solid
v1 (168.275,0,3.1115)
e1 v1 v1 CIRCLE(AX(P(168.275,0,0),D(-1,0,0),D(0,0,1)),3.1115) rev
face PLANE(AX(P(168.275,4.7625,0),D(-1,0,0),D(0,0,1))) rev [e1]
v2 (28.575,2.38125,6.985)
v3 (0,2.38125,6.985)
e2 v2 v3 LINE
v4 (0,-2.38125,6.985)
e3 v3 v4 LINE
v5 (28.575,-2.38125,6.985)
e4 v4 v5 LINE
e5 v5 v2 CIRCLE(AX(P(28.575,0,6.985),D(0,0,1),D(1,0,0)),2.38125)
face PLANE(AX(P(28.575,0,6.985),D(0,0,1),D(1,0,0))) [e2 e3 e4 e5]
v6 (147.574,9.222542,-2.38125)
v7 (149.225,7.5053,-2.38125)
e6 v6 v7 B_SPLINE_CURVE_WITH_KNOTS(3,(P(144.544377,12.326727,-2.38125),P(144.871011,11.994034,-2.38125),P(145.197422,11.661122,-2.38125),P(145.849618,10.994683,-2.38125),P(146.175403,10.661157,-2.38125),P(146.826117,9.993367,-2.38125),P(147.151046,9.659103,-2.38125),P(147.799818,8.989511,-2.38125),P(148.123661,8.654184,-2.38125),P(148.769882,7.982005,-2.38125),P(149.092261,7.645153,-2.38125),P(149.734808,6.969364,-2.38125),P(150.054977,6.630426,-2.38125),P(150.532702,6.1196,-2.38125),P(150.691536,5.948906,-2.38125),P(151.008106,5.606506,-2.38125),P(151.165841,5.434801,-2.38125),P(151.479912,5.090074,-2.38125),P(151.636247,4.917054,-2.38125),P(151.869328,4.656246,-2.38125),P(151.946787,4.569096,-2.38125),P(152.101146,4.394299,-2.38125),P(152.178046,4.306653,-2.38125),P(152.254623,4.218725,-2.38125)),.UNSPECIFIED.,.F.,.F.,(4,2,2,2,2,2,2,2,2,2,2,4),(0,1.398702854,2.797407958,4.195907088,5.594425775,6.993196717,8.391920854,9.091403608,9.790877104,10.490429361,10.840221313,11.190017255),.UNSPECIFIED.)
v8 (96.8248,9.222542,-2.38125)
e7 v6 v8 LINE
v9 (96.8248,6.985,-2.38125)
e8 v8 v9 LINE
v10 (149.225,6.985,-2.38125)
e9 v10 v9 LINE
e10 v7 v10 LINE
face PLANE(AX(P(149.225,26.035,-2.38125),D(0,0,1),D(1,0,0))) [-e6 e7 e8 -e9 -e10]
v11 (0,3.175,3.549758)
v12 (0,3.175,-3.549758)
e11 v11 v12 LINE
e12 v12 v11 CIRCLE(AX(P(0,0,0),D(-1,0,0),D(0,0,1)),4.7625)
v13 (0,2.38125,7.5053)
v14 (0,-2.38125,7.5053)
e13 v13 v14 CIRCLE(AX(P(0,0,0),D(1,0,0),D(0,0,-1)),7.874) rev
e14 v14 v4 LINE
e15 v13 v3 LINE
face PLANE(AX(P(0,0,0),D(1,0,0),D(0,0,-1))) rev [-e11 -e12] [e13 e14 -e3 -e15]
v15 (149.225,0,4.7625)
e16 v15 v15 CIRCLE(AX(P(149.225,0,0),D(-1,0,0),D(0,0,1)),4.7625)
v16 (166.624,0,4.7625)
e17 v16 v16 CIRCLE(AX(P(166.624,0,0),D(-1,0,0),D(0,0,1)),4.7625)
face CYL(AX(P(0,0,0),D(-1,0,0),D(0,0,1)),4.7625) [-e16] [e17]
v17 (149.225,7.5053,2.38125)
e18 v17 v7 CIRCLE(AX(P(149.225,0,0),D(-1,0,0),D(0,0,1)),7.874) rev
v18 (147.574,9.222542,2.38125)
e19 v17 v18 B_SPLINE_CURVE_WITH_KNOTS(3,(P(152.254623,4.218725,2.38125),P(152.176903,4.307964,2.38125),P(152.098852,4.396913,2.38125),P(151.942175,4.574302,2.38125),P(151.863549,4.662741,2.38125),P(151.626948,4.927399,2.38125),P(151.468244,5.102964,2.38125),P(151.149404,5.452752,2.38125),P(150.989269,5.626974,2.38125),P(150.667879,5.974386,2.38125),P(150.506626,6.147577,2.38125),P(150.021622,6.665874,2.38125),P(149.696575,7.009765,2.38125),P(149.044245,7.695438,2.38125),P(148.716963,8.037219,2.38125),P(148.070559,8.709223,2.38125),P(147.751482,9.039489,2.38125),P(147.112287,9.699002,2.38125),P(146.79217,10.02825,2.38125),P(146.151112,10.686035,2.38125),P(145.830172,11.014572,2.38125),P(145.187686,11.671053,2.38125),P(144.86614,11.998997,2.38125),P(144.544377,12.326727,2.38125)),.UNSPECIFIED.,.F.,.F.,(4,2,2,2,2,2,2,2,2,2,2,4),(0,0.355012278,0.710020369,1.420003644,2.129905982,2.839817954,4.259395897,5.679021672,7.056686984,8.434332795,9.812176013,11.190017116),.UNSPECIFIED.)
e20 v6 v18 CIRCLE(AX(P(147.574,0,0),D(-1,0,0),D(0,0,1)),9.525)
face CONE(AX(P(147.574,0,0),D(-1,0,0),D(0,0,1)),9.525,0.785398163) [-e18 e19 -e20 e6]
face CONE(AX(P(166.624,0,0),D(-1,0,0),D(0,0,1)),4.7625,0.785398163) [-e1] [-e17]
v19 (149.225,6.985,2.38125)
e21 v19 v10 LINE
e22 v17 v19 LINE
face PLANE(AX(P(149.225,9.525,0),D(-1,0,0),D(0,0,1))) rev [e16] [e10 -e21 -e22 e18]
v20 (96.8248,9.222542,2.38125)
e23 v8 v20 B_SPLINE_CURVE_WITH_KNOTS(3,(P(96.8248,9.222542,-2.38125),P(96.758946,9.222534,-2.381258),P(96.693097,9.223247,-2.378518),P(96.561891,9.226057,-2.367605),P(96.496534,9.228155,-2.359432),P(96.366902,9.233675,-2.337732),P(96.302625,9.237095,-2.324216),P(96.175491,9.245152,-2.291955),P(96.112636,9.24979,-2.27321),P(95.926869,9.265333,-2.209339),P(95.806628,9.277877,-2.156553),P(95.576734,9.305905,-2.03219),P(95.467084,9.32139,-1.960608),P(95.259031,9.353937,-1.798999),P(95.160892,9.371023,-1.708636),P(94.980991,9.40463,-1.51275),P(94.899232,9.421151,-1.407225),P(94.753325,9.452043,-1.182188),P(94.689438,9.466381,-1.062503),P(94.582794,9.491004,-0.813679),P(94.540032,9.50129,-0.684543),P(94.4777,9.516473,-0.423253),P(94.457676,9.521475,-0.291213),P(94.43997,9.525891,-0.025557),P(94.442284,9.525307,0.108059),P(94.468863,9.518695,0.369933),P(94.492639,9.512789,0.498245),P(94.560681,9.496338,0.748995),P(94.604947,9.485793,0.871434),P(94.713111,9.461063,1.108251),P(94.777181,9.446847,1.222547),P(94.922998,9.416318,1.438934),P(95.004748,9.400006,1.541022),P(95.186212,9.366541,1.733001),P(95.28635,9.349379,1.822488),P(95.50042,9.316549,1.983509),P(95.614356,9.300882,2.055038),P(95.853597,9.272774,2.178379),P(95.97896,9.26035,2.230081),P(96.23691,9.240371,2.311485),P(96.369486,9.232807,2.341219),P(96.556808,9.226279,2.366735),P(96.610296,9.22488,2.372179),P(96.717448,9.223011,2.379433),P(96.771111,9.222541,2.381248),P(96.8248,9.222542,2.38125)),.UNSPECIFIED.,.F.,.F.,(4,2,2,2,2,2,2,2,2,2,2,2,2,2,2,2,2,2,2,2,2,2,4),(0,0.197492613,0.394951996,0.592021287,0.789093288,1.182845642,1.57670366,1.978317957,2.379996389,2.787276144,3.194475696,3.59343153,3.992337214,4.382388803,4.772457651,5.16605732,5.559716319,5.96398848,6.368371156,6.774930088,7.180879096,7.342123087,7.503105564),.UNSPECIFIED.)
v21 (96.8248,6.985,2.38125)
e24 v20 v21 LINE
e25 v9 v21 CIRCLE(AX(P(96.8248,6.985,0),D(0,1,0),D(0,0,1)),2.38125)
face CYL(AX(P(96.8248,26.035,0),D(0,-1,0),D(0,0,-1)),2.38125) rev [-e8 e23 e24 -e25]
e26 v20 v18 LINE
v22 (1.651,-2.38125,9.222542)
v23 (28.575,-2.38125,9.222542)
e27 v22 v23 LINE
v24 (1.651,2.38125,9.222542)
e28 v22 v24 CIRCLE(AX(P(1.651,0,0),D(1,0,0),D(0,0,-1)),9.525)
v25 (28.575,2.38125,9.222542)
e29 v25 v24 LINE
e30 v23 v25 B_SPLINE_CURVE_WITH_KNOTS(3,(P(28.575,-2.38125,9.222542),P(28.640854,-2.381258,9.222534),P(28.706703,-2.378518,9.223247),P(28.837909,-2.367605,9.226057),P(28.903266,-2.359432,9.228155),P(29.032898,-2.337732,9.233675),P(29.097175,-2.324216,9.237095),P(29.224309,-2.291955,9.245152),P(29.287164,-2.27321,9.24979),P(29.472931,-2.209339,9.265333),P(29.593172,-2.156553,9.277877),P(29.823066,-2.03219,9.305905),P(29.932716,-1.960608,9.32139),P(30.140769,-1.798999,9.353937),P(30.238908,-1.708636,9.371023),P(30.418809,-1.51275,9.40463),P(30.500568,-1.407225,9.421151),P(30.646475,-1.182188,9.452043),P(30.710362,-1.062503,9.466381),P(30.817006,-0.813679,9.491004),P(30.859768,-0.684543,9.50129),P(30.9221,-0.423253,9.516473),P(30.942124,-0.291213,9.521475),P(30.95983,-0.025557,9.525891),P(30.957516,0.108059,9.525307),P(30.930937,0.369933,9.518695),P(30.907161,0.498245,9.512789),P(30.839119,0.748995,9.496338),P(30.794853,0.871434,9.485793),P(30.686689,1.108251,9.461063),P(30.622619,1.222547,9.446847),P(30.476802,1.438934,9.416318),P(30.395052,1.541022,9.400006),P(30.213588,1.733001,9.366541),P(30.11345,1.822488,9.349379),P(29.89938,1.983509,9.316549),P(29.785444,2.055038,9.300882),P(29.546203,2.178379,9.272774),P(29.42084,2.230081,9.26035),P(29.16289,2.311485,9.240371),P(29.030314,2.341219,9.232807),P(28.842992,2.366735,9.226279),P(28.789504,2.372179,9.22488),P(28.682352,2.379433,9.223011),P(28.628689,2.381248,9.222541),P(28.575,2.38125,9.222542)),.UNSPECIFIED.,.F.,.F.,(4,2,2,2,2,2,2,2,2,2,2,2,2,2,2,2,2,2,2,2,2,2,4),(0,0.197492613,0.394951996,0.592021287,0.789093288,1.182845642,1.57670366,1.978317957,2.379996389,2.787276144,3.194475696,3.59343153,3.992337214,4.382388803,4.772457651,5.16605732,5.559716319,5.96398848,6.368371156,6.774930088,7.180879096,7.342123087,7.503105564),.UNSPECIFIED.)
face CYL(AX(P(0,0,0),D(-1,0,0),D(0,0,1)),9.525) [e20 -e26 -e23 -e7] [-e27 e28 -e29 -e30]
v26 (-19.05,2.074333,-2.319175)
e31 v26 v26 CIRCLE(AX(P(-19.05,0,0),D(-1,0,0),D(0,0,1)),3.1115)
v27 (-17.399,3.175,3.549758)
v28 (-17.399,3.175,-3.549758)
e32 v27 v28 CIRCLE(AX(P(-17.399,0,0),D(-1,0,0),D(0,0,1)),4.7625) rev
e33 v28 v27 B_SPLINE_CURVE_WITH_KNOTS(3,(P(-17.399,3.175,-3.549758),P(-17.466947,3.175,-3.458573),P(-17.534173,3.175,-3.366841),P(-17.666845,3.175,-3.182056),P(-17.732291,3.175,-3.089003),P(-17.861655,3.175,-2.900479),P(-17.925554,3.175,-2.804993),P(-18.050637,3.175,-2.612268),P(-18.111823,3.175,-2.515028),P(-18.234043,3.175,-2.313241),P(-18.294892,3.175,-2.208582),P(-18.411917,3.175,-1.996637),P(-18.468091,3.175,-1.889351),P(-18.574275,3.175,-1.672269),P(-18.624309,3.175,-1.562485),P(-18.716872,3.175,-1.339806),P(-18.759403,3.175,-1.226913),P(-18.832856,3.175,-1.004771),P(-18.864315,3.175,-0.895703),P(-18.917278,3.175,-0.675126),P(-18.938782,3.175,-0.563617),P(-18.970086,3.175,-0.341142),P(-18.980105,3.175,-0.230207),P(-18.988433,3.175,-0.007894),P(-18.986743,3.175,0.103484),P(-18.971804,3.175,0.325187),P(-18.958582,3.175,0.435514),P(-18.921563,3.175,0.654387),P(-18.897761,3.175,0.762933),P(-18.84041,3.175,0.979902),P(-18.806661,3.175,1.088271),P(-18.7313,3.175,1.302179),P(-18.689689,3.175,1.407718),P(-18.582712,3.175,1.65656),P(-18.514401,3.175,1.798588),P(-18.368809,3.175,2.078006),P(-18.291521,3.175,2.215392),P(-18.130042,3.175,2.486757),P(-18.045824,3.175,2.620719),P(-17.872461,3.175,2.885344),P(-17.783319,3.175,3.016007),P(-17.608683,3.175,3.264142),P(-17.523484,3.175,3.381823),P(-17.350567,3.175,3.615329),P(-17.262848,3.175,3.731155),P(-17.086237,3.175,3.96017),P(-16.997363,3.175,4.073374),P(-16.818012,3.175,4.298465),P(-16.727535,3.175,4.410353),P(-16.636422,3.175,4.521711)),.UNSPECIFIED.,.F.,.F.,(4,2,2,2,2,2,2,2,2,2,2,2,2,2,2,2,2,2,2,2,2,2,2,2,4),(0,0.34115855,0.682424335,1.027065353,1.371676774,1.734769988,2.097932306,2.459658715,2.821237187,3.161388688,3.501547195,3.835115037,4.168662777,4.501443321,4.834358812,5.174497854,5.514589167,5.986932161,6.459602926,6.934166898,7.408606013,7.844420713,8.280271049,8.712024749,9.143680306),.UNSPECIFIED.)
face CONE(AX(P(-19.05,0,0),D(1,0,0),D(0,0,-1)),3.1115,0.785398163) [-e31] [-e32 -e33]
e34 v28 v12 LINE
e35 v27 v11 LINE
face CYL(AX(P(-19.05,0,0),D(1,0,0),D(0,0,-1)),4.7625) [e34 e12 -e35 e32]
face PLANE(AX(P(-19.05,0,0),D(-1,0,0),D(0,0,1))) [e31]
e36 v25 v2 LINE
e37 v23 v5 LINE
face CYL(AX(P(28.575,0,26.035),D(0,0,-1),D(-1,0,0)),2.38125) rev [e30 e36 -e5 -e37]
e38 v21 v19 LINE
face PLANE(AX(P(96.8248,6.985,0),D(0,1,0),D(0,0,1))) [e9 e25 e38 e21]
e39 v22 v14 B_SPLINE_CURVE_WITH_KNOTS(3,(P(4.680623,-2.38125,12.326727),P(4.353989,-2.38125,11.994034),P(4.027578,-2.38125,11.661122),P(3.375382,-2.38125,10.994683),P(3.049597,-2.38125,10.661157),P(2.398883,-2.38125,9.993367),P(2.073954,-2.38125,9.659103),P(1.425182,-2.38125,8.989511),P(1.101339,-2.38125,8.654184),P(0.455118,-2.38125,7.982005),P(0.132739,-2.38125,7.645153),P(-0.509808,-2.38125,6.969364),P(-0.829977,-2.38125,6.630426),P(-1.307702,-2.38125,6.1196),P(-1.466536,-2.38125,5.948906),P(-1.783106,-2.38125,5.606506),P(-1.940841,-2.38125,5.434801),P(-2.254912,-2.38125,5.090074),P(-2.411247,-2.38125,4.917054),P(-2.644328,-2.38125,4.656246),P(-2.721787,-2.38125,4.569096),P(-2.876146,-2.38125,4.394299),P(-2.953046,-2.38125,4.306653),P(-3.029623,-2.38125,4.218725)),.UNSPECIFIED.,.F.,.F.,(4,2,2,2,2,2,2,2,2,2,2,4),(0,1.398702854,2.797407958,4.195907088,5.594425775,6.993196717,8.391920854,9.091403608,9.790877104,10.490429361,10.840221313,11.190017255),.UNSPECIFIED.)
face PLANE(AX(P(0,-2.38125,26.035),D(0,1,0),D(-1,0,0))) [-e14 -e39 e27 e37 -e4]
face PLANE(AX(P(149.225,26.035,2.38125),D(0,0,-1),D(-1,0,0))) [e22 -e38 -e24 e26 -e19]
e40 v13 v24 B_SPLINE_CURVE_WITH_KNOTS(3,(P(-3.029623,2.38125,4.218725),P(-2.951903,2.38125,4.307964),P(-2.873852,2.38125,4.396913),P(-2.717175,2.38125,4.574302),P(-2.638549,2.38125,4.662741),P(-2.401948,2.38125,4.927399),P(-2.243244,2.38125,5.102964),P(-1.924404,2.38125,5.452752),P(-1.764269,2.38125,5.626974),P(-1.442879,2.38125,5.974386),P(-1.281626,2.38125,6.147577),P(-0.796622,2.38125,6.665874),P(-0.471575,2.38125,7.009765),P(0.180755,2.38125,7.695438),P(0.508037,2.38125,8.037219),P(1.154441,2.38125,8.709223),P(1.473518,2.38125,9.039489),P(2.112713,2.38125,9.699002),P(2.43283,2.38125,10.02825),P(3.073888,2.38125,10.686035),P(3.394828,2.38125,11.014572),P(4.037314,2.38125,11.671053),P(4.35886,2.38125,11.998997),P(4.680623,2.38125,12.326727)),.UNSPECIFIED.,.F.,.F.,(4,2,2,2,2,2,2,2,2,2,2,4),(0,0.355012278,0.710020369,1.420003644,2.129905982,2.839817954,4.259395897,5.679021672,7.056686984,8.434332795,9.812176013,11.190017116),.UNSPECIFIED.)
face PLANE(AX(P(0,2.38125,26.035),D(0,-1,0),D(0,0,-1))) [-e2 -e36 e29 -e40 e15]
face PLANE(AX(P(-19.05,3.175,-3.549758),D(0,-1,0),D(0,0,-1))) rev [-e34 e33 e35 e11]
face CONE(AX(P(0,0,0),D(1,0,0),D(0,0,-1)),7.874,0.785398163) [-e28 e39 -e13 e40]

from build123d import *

# Parameters (mm, degrees)
BOSS_EXTRUDE1_DEPTH = 19.05
CUT_EXTRUDE1_START  = 6.985
CUT_EXTRUDE1_DEPTH  = 19.05
CUT_EXTRUDE2_START  = 6.985
CUT_EXTRUDE2_DEPTH  = 19.05


with BuildPart() as part:
    # Sketch1 → Revolve1 (revolve)
    with BuildSketch(Plane.XY, mode=Mode.PRIVATE) as revolve1_sk:
        Polygon((0, 0), (0, 9.525), (149.225, 9.525), (149.225, 4.7625), (168.275, 4.7625), (168.275, 0), align=None)
    revolve(revolve1_sk.sketch.rotate(Axis((0, 0, 0), (1, 0, 0)), 90), axis=Axis((0, 0, 0), (1, 0, 0)))

    # Sketch2 → Boss-Extrude1 (add)
    with BuildSketch(Plane.ZY):
        with BuildLine():
            Line((-3.549757914, 3.175), (3.549757914, 3.175))
            ThreePointArc((3.549757914, 3.175), (0, -4.7625), (-3.549757914, 3.175))
        make_face()
    extrude(amount=BOSS_EXTRUDE1_DEPTH)

    # Chamfer1: read off the stored shape, not the designer's step
    # Chamfer1 outline → Chamfer1 (revolve, cut)
    with BuildSketch(Plane.YX):
        Polygon((4.7625, 168.275), (3.1115, 168.275), (4.7625, 166.624), align=None)
        Polygon((9.525, 149.225), (7.874, 149.225), (9.525, 147.574), align=None)
        Polygon((9.525, 0), (9.525, 1.651), (7.874, 0), align=None)
        Polygon((4.7625, -19.05), (4.7625, -17.399), (3.1115, -19.05), align=None)
    revolve(axis=Axis((0, 0, 0), (1, 0, 0)), mode=Mode.SUBTRACT)

    # Sketch4 → Cut-Extrude1 (cut)
    with BuildSketch(Plane.XY.offset(CUT_EXTRUDE1_START)):
        with BuildLine():
            Line((0, 2.38125), (0, -2.38125))
            Line((0, -2.38125), (28.575, -2.38125))
            ThreePointArc((28.575, -2.38125), (30.95625, 0), (28.575, 2.38125))
            Line((28.575, 2.38125), (0, 2.38125))
        make_face()
    extrude(amount=CUT_EXTRUDE1_DEPTH, mode=Mode.SUBTRACT)

    # Sketch5 → Cut-Extrude2 (cut)
    with BuildSketch(Plane(origin=(0, 0, 0), x_dir=(1, 0, 0), z_dir=(0, 1, 0)).offset(CUT_EXTRUDE2_START)):
        with BuildLine():
            Line((149.225, 2.38125), (149.225, -2.38125))
            Line((149.225, -2.38125), (96.8248, -2.38125))
            ThreePointArc((96.8248, -2.38125), (94.44355, 0), (96.8248, 2.38125))
            Line((96.8248, 2.38125), (149.225, 2.38125))
        make_face()
    extrude(amount=CUT_EXTRUDE2_DEPTH, mode=Mode.SUBTRACT)


solid = part.part
